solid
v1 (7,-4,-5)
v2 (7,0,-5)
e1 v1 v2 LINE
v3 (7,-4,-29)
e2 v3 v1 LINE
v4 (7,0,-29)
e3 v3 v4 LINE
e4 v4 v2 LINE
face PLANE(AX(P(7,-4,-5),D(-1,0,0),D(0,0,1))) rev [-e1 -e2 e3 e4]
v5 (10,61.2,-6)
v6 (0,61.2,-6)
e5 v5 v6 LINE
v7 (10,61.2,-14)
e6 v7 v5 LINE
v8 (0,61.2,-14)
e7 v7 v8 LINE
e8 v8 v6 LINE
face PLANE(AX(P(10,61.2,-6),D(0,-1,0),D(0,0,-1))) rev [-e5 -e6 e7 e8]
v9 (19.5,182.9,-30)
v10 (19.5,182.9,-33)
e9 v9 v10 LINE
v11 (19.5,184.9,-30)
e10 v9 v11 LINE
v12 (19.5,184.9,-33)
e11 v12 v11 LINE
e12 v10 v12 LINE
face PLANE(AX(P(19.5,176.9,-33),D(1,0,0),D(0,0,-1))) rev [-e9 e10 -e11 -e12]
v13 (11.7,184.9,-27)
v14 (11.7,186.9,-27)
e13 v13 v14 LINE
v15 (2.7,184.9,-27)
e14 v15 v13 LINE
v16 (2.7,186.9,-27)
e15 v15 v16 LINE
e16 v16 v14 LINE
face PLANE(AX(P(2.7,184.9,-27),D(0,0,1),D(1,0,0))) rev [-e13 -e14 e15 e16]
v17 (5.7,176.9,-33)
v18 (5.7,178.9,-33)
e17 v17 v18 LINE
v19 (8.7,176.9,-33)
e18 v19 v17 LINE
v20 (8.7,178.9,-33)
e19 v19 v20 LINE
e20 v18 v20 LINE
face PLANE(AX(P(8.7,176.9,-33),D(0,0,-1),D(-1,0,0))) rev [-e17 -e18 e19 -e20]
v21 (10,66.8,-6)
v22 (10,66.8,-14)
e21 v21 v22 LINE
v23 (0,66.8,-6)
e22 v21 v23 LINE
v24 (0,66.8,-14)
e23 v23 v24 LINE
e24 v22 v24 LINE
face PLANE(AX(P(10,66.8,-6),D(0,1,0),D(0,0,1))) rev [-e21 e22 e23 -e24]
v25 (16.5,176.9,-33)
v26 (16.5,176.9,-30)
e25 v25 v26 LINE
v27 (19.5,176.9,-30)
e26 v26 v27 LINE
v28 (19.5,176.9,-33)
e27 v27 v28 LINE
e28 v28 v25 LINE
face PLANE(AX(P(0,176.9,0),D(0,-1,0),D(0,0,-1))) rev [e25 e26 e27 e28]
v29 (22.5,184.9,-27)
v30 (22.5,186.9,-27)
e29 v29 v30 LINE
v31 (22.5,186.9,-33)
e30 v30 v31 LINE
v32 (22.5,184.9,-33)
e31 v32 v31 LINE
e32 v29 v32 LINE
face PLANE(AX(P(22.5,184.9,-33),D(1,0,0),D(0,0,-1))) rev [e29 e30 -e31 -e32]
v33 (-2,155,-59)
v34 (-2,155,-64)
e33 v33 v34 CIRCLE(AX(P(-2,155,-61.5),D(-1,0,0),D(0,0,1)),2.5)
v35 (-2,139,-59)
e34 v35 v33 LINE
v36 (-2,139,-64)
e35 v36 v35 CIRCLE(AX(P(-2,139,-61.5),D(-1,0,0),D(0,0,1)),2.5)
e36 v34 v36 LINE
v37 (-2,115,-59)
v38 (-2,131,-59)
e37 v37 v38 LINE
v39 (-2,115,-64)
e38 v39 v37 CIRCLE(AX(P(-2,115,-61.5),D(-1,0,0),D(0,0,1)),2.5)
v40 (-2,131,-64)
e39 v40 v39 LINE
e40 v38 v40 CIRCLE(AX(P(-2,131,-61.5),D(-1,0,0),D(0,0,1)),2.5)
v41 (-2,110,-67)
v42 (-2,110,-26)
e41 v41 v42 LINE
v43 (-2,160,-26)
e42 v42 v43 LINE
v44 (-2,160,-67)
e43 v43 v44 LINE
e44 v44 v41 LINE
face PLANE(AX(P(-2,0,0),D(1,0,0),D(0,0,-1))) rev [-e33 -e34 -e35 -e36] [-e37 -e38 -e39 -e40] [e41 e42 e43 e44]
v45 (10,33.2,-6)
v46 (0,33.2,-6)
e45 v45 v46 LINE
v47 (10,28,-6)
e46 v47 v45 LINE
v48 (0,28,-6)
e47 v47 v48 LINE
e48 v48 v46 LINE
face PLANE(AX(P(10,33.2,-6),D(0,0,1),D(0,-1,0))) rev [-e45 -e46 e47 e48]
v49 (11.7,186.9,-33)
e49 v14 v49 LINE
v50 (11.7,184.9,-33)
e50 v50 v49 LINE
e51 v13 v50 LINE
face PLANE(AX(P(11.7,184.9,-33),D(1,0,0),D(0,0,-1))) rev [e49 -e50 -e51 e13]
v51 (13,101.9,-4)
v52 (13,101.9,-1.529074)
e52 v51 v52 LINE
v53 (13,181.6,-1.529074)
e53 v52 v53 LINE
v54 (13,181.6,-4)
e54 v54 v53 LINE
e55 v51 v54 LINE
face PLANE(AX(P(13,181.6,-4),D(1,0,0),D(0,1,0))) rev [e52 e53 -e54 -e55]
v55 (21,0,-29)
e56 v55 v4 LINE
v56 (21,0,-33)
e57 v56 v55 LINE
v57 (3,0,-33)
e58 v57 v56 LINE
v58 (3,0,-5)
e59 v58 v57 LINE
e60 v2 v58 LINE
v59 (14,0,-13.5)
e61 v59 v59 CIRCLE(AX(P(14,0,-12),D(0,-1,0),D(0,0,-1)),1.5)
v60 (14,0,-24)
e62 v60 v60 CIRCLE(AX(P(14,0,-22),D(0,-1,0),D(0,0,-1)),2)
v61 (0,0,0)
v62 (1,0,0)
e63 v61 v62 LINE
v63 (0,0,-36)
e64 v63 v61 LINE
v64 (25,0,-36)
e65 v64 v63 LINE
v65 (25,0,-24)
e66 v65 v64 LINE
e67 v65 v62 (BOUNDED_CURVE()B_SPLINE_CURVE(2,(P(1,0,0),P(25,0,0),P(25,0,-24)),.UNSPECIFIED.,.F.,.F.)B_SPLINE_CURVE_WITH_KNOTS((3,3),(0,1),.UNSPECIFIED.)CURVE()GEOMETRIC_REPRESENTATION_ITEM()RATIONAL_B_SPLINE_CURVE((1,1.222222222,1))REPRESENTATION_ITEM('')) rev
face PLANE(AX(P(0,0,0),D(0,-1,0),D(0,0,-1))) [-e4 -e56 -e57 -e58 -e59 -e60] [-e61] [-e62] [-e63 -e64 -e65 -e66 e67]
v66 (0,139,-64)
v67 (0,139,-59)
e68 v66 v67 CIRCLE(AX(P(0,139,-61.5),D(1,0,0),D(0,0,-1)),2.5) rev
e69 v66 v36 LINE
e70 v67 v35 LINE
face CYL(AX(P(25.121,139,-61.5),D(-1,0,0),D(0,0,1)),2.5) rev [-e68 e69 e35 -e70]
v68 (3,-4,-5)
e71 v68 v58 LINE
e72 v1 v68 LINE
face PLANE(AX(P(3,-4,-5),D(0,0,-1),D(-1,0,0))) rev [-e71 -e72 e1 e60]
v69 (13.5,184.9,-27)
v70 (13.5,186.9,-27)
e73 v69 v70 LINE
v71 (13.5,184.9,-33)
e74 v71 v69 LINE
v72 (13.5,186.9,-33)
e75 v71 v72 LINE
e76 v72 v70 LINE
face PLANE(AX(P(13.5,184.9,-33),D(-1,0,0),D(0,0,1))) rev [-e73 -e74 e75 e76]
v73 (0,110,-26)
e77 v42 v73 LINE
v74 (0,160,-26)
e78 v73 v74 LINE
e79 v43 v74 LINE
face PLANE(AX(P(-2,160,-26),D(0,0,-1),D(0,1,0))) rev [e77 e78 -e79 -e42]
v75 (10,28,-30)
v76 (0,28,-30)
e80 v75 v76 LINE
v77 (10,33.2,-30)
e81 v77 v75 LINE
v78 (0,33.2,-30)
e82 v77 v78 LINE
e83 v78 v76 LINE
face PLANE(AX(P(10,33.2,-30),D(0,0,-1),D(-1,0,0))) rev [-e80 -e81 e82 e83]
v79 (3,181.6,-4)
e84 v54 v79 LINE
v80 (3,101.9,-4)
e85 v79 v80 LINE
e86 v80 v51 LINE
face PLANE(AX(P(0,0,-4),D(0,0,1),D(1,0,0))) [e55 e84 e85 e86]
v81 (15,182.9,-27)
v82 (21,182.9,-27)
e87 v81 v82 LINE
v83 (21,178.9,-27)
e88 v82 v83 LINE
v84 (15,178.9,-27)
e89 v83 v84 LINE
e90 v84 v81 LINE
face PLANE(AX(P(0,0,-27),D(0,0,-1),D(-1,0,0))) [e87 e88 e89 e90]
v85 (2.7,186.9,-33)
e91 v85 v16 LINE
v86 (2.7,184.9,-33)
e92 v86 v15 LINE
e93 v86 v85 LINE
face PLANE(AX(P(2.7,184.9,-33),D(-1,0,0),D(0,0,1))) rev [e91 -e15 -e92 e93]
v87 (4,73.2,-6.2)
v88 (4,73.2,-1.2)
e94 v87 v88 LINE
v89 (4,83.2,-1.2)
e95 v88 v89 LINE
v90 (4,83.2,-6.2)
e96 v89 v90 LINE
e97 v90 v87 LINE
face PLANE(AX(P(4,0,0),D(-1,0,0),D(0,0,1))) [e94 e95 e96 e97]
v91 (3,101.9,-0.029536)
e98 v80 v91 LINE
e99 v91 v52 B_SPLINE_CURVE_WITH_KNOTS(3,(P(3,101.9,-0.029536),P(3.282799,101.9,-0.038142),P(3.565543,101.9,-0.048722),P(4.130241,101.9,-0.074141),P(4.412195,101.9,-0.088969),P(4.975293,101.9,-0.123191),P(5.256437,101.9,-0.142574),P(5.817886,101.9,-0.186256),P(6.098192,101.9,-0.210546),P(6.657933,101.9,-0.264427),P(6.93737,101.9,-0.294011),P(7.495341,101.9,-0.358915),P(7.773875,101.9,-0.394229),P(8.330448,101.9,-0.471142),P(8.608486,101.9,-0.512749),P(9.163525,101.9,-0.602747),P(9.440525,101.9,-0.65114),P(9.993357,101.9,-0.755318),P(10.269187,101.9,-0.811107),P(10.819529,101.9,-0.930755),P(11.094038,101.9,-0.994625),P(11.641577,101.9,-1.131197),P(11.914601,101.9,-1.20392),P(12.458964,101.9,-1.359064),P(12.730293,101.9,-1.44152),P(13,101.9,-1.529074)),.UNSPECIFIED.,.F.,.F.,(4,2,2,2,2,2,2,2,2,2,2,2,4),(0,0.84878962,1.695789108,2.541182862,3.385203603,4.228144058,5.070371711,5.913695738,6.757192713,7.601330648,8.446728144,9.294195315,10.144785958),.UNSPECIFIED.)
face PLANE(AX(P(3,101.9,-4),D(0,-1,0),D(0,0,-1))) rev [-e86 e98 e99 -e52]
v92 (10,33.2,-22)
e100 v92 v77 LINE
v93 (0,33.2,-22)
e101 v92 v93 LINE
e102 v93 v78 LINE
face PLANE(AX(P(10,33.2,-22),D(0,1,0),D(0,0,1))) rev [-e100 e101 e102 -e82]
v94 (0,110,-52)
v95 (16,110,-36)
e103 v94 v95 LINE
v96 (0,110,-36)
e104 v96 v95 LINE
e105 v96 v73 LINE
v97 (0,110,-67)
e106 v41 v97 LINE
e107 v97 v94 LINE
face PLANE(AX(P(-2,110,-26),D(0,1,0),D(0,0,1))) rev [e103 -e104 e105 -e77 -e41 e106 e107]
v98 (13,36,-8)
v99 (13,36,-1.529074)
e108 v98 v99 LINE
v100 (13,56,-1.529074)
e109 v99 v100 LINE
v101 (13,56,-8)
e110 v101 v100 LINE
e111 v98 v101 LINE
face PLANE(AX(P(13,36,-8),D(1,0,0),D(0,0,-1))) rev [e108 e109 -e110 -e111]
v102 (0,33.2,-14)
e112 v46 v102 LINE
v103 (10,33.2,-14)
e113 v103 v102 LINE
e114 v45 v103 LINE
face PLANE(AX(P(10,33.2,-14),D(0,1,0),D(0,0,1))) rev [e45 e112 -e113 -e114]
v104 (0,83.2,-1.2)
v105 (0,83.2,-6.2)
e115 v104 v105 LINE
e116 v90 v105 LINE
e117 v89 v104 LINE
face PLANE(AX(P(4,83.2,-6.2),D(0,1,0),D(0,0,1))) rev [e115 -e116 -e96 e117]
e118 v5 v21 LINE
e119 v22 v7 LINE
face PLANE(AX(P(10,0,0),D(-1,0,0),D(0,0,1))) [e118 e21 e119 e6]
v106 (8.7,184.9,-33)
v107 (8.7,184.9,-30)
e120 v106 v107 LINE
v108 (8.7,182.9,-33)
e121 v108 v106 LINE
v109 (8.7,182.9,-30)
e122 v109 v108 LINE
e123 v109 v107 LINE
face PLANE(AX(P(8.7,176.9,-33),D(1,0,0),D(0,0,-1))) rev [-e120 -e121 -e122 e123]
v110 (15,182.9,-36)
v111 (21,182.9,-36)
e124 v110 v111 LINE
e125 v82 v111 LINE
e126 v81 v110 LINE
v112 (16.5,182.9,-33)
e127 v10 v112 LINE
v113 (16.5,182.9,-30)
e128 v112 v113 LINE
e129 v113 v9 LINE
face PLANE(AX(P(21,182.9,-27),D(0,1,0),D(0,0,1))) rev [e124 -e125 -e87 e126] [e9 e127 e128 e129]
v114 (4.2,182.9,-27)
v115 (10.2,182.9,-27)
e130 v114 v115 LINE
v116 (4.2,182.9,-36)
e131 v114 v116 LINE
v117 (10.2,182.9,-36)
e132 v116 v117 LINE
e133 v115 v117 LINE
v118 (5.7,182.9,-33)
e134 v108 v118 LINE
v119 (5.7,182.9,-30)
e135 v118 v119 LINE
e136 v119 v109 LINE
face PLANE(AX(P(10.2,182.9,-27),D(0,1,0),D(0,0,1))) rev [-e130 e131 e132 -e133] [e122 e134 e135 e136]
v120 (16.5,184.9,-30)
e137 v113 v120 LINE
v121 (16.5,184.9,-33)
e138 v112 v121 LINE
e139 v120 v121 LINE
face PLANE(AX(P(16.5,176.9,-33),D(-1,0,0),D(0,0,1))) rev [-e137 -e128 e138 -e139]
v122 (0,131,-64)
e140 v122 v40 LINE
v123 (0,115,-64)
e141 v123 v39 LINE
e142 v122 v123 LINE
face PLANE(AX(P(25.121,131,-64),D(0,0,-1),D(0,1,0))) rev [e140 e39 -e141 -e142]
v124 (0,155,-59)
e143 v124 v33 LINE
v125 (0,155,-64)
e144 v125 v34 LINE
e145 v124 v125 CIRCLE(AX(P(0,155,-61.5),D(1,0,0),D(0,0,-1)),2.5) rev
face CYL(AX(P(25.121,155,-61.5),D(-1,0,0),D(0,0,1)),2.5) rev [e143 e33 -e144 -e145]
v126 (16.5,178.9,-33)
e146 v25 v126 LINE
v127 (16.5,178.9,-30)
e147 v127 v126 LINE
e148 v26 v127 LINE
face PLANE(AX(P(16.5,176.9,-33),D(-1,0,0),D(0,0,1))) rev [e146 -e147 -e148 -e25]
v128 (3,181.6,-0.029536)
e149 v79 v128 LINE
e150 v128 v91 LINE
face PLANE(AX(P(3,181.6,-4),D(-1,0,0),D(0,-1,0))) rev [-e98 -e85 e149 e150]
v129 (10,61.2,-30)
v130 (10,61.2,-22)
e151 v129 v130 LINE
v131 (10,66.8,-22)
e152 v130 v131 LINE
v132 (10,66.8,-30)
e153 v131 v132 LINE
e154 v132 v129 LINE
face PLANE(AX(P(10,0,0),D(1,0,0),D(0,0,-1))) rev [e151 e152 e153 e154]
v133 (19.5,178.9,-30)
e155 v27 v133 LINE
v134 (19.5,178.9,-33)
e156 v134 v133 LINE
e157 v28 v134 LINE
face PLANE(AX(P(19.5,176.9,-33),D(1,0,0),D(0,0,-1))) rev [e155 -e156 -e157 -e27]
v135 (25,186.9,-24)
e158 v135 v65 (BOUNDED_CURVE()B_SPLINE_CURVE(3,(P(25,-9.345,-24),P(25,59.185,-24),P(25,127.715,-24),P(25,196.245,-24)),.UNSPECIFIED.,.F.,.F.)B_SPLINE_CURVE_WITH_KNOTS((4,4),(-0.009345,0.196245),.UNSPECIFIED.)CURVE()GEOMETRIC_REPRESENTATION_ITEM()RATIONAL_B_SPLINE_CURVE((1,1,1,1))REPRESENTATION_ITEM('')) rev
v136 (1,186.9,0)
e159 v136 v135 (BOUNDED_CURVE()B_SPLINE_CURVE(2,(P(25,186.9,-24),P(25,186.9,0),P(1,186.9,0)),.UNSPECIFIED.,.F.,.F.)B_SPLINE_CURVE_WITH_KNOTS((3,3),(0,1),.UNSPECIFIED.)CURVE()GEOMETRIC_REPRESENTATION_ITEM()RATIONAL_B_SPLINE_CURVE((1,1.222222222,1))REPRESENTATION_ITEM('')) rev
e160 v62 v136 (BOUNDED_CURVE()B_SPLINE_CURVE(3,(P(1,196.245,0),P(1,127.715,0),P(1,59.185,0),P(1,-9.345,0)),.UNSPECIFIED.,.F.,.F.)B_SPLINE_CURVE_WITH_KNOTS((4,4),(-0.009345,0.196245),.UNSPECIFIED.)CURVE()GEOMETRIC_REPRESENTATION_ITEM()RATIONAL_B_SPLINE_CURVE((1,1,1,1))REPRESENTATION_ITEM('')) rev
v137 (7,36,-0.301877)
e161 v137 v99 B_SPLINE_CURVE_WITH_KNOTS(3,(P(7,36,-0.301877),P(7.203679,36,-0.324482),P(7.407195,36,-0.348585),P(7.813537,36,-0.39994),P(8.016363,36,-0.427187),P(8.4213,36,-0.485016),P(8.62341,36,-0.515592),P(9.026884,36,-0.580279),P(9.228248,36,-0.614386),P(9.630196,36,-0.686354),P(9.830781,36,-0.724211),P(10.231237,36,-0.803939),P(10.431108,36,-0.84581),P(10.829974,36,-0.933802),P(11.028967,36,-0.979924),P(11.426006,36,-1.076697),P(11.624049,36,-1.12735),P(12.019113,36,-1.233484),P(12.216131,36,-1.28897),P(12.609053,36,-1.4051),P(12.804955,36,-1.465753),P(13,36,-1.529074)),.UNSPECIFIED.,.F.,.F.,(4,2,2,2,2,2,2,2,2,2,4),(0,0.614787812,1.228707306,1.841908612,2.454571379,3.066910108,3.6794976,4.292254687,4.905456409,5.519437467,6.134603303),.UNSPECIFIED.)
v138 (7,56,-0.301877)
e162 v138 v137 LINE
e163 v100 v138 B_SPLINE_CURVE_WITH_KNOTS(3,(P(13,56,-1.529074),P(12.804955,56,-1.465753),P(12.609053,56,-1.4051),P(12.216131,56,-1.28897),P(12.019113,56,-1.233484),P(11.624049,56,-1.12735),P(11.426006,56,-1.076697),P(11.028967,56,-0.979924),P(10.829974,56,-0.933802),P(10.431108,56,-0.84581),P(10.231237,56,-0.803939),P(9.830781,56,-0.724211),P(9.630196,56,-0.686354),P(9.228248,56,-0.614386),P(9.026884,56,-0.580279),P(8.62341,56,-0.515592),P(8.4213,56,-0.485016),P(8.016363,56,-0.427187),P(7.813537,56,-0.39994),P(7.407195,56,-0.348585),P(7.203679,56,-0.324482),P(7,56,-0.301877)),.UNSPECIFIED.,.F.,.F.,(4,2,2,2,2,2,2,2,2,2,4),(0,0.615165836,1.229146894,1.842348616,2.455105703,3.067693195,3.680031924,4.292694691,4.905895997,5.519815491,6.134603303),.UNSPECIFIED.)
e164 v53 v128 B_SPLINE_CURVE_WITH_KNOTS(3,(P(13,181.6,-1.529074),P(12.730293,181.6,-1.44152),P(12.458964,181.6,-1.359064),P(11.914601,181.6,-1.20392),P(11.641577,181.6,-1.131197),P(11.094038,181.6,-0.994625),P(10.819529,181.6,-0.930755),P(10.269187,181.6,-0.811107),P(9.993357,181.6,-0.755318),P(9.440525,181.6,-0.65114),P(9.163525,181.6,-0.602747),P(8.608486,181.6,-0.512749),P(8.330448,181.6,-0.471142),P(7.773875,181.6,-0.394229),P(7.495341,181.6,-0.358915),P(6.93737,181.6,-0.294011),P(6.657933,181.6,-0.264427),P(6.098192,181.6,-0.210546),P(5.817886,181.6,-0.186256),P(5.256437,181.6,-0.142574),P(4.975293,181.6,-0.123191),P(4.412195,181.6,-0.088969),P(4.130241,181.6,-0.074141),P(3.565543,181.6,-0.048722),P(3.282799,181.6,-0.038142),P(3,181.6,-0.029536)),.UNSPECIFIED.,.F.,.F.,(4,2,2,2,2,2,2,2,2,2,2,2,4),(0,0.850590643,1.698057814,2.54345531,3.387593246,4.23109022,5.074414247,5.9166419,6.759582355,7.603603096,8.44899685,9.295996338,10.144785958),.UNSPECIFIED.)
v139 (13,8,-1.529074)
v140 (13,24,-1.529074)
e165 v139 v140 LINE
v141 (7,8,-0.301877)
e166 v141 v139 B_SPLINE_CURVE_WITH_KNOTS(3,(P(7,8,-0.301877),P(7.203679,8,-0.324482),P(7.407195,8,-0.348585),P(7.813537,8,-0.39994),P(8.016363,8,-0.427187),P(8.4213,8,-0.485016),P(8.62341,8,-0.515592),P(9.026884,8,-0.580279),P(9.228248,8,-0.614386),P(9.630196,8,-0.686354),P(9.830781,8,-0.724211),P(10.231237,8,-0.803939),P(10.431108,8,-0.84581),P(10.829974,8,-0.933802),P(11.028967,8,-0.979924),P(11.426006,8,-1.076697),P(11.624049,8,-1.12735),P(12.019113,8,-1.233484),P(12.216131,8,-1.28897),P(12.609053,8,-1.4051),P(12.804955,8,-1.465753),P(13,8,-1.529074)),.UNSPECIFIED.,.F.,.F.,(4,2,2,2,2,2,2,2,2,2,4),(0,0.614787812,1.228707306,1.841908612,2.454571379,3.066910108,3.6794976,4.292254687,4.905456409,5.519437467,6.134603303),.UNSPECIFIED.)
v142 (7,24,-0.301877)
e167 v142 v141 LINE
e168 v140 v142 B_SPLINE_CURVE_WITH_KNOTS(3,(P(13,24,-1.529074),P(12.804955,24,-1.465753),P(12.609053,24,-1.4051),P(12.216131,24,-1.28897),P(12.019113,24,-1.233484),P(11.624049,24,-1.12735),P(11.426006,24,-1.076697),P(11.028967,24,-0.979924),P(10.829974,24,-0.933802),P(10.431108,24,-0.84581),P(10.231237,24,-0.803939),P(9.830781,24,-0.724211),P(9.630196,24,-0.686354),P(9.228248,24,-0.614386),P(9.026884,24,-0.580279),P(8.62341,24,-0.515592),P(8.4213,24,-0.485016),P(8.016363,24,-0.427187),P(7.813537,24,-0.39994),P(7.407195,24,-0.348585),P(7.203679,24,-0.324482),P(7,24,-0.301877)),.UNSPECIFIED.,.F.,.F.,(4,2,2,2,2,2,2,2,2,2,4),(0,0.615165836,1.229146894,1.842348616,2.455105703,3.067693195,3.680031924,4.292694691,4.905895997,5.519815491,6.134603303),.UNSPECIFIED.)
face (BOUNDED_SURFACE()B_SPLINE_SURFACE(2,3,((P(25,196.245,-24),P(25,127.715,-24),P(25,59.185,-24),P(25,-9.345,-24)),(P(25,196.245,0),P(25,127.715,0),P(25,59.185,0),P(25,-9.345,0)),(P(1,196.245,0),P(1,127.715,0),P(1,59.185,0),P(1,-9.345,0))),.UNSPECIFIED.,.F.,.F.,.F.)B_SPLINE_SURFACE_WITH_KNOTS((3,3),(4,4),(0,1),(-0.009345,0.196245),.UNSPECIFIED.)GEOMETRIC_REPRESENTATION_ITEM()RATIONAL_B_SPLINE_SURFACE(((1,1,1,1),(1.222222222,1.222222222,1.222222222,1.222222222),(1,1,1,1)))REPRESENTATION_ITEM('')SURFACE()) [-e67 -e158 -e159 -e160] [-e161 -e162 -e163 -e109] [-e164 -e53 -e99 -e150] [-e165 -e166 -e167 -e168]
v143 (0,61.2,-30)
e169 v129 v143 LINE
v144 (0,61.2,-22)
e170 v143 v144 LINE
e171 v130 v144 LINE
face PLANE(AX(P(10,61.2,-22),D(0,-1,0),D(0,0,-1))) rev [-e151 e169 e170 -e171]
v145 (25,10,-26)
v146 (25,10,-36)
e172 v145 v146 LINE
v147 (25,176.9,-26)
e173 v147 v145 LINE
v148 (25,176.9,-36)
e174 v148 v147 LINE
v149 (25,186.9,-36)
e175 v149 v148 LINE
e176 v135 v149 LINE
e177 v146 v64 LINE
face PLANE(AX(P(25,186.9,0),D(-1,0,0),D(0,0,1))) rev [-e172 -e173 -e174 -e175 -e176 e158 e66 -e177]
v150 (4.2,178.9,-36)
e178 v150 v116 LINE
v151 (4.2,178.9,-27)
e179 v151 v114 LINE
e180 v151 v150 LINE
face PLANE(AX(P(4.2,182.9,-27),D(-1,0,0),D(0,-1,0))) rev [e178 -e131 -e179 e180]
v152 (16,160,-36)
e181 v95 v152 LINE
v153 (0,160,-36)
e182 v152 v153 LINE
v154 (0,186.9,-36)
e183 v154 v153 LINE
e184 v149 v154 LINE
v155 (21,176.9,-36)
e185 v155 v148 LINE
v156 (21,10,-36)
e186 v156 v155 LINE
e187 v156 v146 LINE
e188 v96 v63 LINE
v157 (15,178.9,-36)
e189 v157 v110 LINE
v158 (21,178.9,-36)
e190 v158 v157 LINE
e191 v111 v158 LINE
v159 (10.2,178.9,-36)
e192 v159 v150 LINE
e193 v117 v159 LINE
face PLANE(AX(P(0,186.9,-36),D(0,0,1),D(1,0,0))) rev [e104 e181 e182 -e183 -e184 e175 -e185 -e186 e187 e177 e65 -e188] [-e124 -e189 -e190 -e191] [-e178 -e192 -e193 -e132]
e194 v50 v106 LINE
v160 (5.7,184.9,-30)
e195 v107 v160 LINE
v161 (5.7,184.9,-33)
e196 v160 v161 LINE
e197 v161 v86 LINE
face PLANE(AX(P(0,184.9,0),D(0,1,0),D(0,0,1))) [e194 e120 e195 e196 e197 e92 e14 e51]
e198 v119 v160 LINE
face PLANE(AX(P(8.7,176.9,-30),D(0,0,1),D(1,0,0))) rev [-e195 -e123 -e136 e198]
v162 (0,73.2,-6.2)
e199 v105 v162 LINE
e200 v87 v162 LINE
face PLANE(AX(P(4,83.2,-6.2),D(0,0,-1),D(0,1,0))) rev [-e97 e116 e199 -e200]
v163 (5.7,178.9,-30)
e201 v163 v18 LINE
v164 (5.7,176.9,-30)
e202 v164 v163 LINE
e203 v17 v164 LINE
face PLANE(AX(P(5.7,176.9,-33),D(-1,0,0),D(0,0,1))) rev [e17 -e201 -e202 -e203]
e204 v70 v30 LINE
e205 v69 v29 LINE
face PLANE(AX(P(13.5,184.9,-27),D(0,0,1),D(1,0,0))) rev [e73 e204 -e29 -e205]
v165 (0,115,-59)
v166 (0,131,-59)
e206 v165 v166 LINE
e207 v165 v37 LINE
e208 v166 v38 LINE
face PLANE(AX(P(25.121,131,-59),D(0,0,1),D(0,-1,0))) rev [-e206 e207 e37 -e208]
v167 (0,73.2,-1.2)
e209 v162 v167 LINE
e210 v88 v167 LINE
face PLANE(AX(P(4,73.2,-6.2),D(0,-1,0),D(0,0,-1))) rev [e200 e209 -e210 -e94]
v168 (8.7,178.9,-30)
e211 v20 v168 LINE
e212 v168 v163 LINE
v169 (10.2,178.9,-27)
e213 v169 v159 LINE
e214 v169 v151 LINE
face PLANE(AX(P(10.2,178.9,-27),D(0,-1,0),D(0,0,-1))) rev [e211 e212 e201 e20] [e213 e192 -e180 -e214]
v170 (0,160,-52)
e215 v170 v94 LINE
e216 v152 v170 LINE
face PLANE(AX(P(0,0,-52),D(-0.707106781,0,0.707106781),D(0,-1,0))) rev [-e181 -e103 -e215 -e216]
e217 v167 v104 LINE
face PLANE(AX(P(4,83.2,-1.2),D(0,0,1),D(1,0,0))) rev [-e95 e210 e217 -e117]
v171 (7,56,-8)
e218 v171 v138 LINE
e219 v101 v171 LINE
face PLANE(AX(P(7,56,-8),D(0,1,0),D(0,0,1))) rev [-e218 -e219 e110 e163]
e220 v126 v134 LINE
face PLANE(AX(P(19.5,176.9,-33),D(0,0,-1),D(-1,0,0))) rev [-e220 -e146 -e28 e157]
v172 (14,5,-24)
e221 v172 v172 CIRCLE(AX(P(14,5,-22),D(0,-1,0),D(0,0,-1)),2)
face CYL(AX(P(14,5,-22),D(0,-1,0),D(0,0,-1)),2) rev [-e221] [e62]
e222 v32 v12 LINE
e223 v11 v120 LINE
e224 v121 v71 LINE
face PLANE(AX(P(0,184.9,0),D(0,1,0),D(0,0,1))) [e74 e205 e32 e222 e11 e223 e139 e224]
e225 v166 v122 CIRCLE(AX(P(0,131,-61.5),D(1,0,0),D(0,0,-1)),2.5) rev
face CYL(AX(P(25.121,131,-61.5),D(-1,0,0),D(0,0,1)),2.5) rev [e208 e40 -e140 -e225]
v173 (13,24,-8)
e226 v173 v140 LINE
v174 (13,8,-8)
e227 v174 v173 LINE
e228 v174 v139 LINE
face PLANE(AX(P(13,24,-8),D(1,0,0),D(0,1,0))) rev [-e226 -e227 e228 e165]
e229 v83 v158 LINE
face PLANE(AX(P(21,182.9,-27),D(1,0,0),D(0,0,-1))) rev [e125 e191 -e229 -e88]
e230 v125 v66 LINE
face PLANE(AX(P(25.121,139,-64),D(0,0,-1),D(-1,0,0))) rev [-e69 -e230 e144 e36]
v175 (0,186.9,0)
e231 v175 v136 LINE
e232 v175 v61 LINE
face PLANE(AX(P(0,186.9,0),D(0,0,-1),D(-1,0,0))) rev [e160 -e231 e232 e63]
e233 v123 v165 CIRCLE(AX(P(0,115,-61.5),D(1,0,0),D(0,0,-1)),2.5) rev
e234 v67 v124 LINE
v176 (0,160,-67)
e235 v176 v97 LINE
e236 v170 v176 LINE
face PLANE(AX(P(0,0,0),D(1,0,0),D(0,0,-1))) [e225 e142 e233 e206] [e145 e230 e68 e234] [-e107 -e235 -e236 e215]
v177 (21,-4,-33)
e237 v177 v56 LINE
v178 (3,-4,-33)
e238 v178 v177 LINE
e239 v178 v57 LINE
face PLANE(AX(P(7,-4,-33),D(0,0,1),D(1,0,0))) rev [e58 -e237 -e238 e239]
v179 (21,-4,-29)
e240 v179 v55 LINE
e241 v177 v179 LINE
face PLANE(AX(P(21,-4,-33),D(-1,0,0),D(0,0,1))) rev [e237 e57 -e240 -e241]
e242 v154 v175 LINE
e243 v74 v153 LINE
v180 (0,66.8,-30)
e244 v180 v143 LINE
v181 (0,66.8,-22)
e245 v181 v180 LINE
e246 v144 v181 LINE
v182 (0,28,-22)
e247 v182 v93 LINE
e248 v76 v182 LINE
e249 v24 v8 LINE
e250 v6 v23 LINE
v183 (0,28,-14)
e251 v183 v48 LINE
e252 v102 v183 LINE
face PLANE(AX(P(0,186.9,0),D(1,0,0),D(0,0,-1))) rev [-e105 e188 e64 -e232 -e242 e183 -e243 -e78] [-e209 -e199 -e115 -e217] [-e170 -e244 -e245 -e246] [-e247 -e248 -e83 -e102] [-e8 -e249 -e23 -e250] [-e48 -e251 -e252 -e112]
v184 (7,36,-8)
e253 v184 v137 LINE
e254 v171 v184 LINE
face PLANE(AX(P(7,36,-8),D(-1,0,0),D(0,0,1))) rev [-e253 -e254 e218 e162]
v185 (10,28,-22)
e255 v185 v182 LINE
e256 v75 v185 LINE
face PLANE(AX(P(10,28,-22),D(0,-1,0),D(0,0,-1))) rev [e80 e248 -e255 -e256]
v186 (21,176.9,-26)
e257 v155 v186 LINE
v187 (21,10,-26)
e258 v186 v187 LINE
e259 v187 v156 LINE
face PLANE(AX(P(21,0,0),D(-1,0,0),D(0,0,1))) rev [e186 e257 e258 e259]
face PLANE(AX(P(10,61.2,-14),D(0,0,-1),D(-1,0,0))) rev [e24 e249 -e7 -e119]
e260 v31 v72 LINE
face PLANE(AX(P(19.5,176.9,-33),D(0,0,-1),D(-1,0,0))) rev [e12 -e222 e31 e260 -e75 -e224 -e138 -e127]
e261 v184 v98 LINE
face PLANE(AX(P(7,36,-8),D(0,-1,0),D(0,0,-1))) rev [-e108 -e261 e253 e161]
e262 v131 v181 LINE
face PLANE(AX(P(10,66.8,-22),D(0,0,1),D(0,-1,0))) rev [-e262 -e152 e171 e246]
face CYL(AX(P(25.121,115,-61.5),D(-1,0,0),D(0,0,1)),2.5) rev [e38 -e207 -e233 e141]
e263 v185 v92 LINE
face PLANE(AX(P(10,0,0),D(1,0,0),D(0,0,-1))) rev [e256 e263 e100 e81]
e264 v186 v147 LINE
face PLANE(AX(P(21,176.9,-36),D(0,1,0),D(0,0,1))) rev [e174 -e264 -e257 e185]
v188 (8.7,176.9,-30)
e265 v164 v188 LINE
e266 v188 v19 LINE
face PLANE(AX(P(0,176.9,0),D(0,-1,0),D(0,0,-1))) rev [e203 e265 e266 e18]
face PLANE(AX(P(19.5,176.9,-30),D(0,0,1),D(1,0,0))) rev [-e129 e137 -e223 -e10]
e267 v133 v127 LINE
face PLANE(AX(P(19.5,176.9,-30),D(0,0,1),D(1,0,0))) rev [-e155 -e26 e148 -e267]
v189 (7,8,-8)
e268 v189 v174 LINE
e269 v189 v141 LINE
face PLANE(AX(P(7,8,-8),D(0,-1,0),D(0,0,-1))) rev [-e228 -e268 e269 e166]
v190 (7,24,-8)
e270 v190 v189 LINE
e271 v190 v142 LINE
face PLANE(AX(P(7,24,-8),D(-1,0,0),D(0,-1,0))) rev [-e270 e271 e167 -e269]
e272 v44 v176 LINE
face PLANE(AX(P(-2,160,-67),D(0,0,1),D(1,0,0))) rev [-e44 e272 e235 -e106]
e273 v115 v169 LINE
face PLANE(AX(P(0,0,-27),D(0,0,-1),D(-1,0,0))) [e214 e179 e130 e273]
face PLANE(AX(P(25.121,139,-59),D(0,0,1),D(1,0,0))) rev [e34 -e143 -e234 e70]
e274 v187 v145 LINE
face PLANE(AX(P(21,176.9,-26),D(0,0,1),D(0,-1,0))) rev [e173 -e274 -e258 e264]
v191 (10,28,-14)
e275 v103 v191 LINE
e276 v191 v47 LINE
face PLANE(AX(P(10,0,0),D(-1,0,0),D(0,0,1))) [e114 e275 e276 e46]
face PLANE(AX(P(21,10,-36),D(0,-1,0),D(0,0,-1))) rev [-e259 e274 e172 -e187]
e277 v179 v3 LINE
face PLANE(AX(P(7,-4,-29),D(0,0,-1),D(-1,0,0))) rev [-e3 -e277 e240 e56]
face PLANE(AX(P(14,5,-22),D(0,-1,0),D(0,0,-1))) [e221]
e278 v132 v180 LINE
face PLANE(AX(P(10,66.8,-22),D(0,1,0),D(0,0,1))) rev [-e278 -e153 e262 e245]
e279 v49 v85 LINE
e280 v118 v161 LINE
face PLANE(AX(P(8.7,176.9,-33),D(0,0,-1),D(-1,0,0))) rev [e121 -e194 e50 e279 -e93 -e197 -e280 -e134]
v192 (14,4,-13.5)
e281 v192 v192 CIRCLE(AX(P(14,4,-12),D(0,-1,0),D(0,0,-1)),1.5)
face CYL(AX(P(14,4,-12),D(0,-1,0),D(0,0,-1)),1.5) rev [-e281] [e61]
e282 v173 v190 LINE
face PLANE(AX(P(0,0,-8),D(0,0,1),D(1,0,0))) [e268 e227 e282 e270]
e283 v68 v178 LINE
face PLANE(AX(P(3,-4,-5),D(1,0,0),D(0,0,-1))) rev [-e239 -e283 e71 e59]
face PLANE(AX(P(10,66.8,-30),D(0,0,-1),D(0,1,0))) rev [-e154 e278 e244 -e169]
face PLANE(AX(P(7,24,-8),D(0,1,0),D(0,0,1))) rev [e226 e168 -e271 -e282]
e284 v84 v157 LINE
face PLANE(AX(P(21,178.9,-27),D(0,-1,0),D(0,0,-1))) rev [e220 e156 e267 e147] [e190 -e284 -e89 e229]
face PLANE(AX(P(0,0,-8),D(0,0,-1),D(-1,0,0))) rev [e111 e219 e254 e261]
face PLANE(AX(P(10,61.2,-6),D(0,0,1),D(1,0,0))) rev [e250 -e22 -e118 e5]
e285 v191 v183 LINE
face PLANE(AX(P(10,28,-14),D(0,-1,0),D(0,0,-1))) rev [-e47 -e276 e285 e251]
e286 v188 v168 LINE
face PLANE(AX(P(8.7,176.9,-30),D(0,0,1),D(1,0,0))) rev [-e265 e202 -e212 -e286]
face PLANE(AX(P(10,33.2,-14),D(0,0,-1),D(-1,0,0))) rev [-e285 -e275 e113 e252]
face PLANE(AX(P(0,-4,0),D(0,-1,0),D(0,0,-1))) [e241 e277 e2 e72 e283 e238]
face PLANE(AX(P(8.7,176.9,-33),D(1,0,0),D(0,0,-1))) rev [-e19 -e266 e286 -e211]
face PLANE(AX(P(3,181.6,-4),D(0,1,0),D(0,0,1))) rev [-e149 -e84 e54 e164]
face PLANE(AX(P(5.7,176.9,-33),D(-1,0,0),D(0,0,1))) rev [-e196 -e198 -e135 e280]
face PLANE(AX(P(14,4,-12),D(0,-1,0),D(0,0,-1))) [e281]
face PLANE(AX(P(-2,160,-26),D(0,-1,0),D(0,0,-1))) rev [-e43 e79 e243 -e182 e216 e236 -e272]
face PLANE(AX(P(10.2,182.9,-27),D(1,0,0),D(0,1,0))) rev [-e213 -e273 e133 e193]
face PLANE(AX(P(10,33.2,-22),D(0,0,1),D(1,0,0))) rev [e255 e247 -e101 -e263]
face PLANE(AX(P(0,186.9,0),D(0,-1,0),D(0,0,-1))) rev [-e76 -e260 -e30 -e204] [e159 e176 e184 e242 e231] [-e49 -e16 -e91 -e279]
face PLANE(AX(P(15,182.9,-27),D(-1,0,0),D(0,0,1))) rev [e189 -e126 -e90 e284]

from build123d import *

# Parameters (mm, degrees)
SKETCH1_W           = 25
SKETCH1_H           = 36
BOSS_EXTRUDE1_DEPTH = 186.9
FILLET1_SIZE        = 24
SKETCH2_W           = 5
SKETCH2_H           = 10
CUT_EXTRUDE1_DEPTH  = 4
SKETCH3_W           = 8
SKETCH3_H           = 5.2
SKETCH3_H_2         = 5.6
CUT_EXTRUDE2_DEPTH  = 10
SKETCH4_W           = 41
SKETCH4_H           = 50
BOSS_EXTRUDE2_DEPTH = 2
CUT_EXTRUDE3_REACH  = 202.374
CHAMFER1_SIZE       = 16
SKETCH6_W           = 6
SKETCH6_H           = 4
CUT_EXTRUDE4_DEPTH  = 9
SKETCH7_W           = 3
SKETCH7_H           = 3
CUT_EXTRUDE5_DEPTH  = 10
BOSS_EXTRUDE3_DEPTH = 4
SKETCH9_R           = 2
CUT_EXTRUDE6_DEPTH  = 5
SKETCH10_R          = 1.5
CUT_EXTRUDE7_DEPTH  = 4
SKETCH11_W          = 6
SKETCH11_H          = 16
SKETCH11_H_2        = 20
CUT_EXTRUDE8_DEPTH  = 8
SKETCH12_W          = 10
SKETCH12_H          = 79.7
CUT_EXTRUDE9_DEPTH  = 4
SKETCH13_W          = 10
SKETCH13_H          = 166.9
CUT_EXTRUDE10_DEPTH = 4
SKETCH14_W          = 9
SKETCH14_H          = 6
CUT_EXTRUDE11_DEPTH = 2


with BuildPart() as part:
    # Sketch1 → Boss-Extrude1 (new body)
    with BuildSketch(Plane(origin=(0, 0, 0), x_dir=(1, 0, 0), z_dir=(0, 1, 0))):
        with Locations((12.5, 18)):
            Rectangle(SKETCH1_W, SKETCH1_H)
    extrude(amount=BOSS_EXTRUDE1_DEPTH)

    # Fillet1
    # a fillet whose section is not a circle: 24 mm, written as the material it takes off along each edge
    with BuildSketch(Plane(origin=(25, -60, 0), x_dir=(-1, 0, 0), z_dir=(0, 1, 0))) as fillet1_piece_1:
        with BuildLine():
            Bezier((FILLET1_SIZE, 0), (0, 0), (0, -FILLET1_SIZE), weights=[1, 1.222222222, 1])
            Line((0, -FILLET1_SIZE), (0, 0))
            Line((0, 0), (FILLET1_SIZE, 0))
        make_face()
    extrude(amount=306.9, mode=Mode.SUBTRACT)

    # Sketch2 → Cut-Extrude1 (cut)
    with BuildSketch(Plane.ZY):
        with Locations((-3.7, 78.2)):
            Rectangle(SKETCH2_W, SKETCH2_H)
    extrude(amount=-CUT_EXTRUDE1_DEPTH, mode=Mode.SUBTRACT)

    # Sketch3 → Cut-Extrude2 (cut)
    with BuildSketch(Plane.ZY):
        with Locations((-10, 30.6)):
            Rectangle(SKETCH3_W, SKETCH3_H)
        with Locations((-26, 30.6)):
            Rectangle(SKETCH3_W, SKETCH3_H)
        with Locations((-10, 64)):
            Rectangle(SKETCH3_W, SKETCH3_H_2)
        with Locations((-26, 64)):
            Rectangle(SKETCH3_W, SKETCH3_H_2)
    extrude(amount=-CUT_EXTRUDE2_DEPTH, mode=Mode.SUBTRACT)

    # Sketch4 → Boss-Extrude2 (add)
    with BuildSketch(Plane.ZY):
        with Locations((-46.5, 135)):
            Rectangle(SKETCH4_W, SKETCH4_H)
    extrude(amount=BOSS_EXTRUDE2_DEPTH)

    # Sketch5 → Cut-Extrude3 (cut, up to next)
    with BuildSketch(Plane.ZY.offset(2), mode=Mode.PRIVATE) as cut_extrude3_sk1:
        with BuildLine():
            Line((-59, 131), (-59, 115))
            ThreePointArc((-59, 115), (-61.5, 112.5), (-64, 115))
            Line((-64, 115), (-64, 131))
            ThreePointArc((-64, 131), (-61.5, 133.5), (-59, 131))
        make_face()
    cut_extrude3_tool1 = extrude(cut_extrude3_sk1.sketch, amount=-CUT_EXTRUDE3_REACH, mode=Mode.PRIVATE) & part.part
    # Sketch5 → Cut-Extrude3 (cut, up to next)
    with BuildSketch(Plane.ZY.offset(2), mode=Mode.PRIVATE) as cut_extrude3_sk2:
        with BuildLine():
            Line((-64, 139), (-64, 155))
            ThreePointArc((-64, 155), (-61.5, 157.5), (-59, 155))
            Line((-59, 155), (-59, 139))
            ThreePointArc((-59, 139), (-61.5, 136.5), (-64, 139))
        make_face()
    cut_extrude3_tool2 = extrude(cut_extrude3_sk2.sketch, amount=-CUT_EXTRUDE3_REACH, mode=Mode.PRIVATE) & part.part
    add(cut_extrude3_tool1.solids().sort_by_distance((-2, 123, -61.5))[0], mode=Mode.SUBTRACT)
    add(cut_extrude3_tool2.solids().sort_by_distance((-2, 147, -61.5))[0], mode=Mode.SUBTRACT)

    # Chamfer1
    chamfer1_edges = [part.edges().sort_by_distance(p)[0] for p in [
        (0, 135, -36),
    ]]
    chamfer(chamfer1_edges, length=CHAMFER1_SIZE)

    # Sketch6 → Cut-Extrude4 (cut)
    with BuildSketch(Plane(origin=(0, 0, -36), x_dir=(-1, 0, 0), z_dir=(0, 0, -1))):
        with Locations((-18, 180.9)):
            Rectangle(SKETCH6_W, SKETCH6_H)
        with Locations((-7.2, 180.9)):
            Rectangle(SKETCH6_W, SKETCH6_H)
    extrude(amount=-CUT_EXTRUDE4_DEPTH, mode=Mode.SUBTRACT)

    # Sketch7 → Cut-Extrude5 (cut)
    with BuildSketch(Plane(origin=(0, 186.9, 0), x_dir=(1, 0, 0), z_dir=(0, 1, 0))):
        with Locations((18, 31.5)):
            Rectangle(SKETCH7_W, SKETCH7_H)
        with Locations((7.2, 31.5)):
            Rectangle(SKETCH7_W, SKETCH7_H)
    extrude(amount=-CUT_EXTRUDE5_DEPTH, mode=Mode.SUBTRACT)

    # Sketch8 → Boss-Extrude3 (add)
    with BuildSketch(Plane.XZ):
        Polygon((3, -5), (7, -5), (7, -29), (21, -29), (21, -33), (7, -33), (3, -33), align=None)
    extrude(amount=BOSS_EXTRUDE3_DEPTH)

    # Sketch9 → Cut-Extrude6 (cut)
    with BuildSketch(Plane.XZ):
        with Locations(Location((14, -22, 0), (0, 0, 270))):
            Circle(SKETCH9_R)
    extrude(amount=-CUT_EXTRUDE6_DEPTH, mode=Mode.SUBTRACT)

    # Sketch10 → Cut-Extrude7 (cut)
    with BuildSketch(Plane.XZ):
        with Locations(Location((14, -12, 0), (0, 0, 270))):
            Circle(SKETCH10_R)
    extrude(amount=-CUT_EXTRUDE7_DEPTH, mode=Mode.SUBTRACT)

    # Sketch11 → Cut-Extrude8 (cut)
    with BuildSketch(Plane.XY):
        with Locations((10, 16)):
            Rectangle(SKETCH11_W, SKETCH11_H)
        with Locations((10, 46)):
            Rectangle(SKETCH11_W, SKETCH11_H_2)
    extrude(amount=-CUT_EXTRUDE8_DEPTH, mode=Mode.SUBTRACT)

    # Sketch12 → Cut-Extrude9 (cut)
    with BuildSketch(Plane.XY):
        with Locations((8, 141.75)):
            Rectangle(SKETCH12_W, SKETCH12_H)
    extrude(amount=-CUT_EXTRUDE9_DEPTH, mode=Mode.SUBTRACT)

    # Sketch13 → Cut-Extrude10 (cut)
    with BuildSketch(Plane(origin=(25, 0, 0), x_dir=(0, 0, -1), z_dir=(1, 0, 0))):
        with Locations((31, 93.45)):
            Rectangle(SKETCH13_W, SKETCH13_H)
    extrude(amount=-CUT_EXTRUDE10_DEPTH, mode=Mode.SUBTRACT)

    # Sketch14 → Cut-Extrude11 (cut)
    with BuildSketch(Plane(origin=(0, 186.9, 0), x_dir=(1, 0, 0), z_dir=(0, 1, 0))):
        with Locations((7.2, 30)):
            Rectangle(SKETCH14_W, SKETCH14_H)
        with Locations((18, 30)):
            Rectangle(SKETCH14_W, SKETCH14_H)
    extrude(amount=-CUT_EXTRUDE11_DEPTH, mode=Mode.SUBTRACT)


solid = part.part
